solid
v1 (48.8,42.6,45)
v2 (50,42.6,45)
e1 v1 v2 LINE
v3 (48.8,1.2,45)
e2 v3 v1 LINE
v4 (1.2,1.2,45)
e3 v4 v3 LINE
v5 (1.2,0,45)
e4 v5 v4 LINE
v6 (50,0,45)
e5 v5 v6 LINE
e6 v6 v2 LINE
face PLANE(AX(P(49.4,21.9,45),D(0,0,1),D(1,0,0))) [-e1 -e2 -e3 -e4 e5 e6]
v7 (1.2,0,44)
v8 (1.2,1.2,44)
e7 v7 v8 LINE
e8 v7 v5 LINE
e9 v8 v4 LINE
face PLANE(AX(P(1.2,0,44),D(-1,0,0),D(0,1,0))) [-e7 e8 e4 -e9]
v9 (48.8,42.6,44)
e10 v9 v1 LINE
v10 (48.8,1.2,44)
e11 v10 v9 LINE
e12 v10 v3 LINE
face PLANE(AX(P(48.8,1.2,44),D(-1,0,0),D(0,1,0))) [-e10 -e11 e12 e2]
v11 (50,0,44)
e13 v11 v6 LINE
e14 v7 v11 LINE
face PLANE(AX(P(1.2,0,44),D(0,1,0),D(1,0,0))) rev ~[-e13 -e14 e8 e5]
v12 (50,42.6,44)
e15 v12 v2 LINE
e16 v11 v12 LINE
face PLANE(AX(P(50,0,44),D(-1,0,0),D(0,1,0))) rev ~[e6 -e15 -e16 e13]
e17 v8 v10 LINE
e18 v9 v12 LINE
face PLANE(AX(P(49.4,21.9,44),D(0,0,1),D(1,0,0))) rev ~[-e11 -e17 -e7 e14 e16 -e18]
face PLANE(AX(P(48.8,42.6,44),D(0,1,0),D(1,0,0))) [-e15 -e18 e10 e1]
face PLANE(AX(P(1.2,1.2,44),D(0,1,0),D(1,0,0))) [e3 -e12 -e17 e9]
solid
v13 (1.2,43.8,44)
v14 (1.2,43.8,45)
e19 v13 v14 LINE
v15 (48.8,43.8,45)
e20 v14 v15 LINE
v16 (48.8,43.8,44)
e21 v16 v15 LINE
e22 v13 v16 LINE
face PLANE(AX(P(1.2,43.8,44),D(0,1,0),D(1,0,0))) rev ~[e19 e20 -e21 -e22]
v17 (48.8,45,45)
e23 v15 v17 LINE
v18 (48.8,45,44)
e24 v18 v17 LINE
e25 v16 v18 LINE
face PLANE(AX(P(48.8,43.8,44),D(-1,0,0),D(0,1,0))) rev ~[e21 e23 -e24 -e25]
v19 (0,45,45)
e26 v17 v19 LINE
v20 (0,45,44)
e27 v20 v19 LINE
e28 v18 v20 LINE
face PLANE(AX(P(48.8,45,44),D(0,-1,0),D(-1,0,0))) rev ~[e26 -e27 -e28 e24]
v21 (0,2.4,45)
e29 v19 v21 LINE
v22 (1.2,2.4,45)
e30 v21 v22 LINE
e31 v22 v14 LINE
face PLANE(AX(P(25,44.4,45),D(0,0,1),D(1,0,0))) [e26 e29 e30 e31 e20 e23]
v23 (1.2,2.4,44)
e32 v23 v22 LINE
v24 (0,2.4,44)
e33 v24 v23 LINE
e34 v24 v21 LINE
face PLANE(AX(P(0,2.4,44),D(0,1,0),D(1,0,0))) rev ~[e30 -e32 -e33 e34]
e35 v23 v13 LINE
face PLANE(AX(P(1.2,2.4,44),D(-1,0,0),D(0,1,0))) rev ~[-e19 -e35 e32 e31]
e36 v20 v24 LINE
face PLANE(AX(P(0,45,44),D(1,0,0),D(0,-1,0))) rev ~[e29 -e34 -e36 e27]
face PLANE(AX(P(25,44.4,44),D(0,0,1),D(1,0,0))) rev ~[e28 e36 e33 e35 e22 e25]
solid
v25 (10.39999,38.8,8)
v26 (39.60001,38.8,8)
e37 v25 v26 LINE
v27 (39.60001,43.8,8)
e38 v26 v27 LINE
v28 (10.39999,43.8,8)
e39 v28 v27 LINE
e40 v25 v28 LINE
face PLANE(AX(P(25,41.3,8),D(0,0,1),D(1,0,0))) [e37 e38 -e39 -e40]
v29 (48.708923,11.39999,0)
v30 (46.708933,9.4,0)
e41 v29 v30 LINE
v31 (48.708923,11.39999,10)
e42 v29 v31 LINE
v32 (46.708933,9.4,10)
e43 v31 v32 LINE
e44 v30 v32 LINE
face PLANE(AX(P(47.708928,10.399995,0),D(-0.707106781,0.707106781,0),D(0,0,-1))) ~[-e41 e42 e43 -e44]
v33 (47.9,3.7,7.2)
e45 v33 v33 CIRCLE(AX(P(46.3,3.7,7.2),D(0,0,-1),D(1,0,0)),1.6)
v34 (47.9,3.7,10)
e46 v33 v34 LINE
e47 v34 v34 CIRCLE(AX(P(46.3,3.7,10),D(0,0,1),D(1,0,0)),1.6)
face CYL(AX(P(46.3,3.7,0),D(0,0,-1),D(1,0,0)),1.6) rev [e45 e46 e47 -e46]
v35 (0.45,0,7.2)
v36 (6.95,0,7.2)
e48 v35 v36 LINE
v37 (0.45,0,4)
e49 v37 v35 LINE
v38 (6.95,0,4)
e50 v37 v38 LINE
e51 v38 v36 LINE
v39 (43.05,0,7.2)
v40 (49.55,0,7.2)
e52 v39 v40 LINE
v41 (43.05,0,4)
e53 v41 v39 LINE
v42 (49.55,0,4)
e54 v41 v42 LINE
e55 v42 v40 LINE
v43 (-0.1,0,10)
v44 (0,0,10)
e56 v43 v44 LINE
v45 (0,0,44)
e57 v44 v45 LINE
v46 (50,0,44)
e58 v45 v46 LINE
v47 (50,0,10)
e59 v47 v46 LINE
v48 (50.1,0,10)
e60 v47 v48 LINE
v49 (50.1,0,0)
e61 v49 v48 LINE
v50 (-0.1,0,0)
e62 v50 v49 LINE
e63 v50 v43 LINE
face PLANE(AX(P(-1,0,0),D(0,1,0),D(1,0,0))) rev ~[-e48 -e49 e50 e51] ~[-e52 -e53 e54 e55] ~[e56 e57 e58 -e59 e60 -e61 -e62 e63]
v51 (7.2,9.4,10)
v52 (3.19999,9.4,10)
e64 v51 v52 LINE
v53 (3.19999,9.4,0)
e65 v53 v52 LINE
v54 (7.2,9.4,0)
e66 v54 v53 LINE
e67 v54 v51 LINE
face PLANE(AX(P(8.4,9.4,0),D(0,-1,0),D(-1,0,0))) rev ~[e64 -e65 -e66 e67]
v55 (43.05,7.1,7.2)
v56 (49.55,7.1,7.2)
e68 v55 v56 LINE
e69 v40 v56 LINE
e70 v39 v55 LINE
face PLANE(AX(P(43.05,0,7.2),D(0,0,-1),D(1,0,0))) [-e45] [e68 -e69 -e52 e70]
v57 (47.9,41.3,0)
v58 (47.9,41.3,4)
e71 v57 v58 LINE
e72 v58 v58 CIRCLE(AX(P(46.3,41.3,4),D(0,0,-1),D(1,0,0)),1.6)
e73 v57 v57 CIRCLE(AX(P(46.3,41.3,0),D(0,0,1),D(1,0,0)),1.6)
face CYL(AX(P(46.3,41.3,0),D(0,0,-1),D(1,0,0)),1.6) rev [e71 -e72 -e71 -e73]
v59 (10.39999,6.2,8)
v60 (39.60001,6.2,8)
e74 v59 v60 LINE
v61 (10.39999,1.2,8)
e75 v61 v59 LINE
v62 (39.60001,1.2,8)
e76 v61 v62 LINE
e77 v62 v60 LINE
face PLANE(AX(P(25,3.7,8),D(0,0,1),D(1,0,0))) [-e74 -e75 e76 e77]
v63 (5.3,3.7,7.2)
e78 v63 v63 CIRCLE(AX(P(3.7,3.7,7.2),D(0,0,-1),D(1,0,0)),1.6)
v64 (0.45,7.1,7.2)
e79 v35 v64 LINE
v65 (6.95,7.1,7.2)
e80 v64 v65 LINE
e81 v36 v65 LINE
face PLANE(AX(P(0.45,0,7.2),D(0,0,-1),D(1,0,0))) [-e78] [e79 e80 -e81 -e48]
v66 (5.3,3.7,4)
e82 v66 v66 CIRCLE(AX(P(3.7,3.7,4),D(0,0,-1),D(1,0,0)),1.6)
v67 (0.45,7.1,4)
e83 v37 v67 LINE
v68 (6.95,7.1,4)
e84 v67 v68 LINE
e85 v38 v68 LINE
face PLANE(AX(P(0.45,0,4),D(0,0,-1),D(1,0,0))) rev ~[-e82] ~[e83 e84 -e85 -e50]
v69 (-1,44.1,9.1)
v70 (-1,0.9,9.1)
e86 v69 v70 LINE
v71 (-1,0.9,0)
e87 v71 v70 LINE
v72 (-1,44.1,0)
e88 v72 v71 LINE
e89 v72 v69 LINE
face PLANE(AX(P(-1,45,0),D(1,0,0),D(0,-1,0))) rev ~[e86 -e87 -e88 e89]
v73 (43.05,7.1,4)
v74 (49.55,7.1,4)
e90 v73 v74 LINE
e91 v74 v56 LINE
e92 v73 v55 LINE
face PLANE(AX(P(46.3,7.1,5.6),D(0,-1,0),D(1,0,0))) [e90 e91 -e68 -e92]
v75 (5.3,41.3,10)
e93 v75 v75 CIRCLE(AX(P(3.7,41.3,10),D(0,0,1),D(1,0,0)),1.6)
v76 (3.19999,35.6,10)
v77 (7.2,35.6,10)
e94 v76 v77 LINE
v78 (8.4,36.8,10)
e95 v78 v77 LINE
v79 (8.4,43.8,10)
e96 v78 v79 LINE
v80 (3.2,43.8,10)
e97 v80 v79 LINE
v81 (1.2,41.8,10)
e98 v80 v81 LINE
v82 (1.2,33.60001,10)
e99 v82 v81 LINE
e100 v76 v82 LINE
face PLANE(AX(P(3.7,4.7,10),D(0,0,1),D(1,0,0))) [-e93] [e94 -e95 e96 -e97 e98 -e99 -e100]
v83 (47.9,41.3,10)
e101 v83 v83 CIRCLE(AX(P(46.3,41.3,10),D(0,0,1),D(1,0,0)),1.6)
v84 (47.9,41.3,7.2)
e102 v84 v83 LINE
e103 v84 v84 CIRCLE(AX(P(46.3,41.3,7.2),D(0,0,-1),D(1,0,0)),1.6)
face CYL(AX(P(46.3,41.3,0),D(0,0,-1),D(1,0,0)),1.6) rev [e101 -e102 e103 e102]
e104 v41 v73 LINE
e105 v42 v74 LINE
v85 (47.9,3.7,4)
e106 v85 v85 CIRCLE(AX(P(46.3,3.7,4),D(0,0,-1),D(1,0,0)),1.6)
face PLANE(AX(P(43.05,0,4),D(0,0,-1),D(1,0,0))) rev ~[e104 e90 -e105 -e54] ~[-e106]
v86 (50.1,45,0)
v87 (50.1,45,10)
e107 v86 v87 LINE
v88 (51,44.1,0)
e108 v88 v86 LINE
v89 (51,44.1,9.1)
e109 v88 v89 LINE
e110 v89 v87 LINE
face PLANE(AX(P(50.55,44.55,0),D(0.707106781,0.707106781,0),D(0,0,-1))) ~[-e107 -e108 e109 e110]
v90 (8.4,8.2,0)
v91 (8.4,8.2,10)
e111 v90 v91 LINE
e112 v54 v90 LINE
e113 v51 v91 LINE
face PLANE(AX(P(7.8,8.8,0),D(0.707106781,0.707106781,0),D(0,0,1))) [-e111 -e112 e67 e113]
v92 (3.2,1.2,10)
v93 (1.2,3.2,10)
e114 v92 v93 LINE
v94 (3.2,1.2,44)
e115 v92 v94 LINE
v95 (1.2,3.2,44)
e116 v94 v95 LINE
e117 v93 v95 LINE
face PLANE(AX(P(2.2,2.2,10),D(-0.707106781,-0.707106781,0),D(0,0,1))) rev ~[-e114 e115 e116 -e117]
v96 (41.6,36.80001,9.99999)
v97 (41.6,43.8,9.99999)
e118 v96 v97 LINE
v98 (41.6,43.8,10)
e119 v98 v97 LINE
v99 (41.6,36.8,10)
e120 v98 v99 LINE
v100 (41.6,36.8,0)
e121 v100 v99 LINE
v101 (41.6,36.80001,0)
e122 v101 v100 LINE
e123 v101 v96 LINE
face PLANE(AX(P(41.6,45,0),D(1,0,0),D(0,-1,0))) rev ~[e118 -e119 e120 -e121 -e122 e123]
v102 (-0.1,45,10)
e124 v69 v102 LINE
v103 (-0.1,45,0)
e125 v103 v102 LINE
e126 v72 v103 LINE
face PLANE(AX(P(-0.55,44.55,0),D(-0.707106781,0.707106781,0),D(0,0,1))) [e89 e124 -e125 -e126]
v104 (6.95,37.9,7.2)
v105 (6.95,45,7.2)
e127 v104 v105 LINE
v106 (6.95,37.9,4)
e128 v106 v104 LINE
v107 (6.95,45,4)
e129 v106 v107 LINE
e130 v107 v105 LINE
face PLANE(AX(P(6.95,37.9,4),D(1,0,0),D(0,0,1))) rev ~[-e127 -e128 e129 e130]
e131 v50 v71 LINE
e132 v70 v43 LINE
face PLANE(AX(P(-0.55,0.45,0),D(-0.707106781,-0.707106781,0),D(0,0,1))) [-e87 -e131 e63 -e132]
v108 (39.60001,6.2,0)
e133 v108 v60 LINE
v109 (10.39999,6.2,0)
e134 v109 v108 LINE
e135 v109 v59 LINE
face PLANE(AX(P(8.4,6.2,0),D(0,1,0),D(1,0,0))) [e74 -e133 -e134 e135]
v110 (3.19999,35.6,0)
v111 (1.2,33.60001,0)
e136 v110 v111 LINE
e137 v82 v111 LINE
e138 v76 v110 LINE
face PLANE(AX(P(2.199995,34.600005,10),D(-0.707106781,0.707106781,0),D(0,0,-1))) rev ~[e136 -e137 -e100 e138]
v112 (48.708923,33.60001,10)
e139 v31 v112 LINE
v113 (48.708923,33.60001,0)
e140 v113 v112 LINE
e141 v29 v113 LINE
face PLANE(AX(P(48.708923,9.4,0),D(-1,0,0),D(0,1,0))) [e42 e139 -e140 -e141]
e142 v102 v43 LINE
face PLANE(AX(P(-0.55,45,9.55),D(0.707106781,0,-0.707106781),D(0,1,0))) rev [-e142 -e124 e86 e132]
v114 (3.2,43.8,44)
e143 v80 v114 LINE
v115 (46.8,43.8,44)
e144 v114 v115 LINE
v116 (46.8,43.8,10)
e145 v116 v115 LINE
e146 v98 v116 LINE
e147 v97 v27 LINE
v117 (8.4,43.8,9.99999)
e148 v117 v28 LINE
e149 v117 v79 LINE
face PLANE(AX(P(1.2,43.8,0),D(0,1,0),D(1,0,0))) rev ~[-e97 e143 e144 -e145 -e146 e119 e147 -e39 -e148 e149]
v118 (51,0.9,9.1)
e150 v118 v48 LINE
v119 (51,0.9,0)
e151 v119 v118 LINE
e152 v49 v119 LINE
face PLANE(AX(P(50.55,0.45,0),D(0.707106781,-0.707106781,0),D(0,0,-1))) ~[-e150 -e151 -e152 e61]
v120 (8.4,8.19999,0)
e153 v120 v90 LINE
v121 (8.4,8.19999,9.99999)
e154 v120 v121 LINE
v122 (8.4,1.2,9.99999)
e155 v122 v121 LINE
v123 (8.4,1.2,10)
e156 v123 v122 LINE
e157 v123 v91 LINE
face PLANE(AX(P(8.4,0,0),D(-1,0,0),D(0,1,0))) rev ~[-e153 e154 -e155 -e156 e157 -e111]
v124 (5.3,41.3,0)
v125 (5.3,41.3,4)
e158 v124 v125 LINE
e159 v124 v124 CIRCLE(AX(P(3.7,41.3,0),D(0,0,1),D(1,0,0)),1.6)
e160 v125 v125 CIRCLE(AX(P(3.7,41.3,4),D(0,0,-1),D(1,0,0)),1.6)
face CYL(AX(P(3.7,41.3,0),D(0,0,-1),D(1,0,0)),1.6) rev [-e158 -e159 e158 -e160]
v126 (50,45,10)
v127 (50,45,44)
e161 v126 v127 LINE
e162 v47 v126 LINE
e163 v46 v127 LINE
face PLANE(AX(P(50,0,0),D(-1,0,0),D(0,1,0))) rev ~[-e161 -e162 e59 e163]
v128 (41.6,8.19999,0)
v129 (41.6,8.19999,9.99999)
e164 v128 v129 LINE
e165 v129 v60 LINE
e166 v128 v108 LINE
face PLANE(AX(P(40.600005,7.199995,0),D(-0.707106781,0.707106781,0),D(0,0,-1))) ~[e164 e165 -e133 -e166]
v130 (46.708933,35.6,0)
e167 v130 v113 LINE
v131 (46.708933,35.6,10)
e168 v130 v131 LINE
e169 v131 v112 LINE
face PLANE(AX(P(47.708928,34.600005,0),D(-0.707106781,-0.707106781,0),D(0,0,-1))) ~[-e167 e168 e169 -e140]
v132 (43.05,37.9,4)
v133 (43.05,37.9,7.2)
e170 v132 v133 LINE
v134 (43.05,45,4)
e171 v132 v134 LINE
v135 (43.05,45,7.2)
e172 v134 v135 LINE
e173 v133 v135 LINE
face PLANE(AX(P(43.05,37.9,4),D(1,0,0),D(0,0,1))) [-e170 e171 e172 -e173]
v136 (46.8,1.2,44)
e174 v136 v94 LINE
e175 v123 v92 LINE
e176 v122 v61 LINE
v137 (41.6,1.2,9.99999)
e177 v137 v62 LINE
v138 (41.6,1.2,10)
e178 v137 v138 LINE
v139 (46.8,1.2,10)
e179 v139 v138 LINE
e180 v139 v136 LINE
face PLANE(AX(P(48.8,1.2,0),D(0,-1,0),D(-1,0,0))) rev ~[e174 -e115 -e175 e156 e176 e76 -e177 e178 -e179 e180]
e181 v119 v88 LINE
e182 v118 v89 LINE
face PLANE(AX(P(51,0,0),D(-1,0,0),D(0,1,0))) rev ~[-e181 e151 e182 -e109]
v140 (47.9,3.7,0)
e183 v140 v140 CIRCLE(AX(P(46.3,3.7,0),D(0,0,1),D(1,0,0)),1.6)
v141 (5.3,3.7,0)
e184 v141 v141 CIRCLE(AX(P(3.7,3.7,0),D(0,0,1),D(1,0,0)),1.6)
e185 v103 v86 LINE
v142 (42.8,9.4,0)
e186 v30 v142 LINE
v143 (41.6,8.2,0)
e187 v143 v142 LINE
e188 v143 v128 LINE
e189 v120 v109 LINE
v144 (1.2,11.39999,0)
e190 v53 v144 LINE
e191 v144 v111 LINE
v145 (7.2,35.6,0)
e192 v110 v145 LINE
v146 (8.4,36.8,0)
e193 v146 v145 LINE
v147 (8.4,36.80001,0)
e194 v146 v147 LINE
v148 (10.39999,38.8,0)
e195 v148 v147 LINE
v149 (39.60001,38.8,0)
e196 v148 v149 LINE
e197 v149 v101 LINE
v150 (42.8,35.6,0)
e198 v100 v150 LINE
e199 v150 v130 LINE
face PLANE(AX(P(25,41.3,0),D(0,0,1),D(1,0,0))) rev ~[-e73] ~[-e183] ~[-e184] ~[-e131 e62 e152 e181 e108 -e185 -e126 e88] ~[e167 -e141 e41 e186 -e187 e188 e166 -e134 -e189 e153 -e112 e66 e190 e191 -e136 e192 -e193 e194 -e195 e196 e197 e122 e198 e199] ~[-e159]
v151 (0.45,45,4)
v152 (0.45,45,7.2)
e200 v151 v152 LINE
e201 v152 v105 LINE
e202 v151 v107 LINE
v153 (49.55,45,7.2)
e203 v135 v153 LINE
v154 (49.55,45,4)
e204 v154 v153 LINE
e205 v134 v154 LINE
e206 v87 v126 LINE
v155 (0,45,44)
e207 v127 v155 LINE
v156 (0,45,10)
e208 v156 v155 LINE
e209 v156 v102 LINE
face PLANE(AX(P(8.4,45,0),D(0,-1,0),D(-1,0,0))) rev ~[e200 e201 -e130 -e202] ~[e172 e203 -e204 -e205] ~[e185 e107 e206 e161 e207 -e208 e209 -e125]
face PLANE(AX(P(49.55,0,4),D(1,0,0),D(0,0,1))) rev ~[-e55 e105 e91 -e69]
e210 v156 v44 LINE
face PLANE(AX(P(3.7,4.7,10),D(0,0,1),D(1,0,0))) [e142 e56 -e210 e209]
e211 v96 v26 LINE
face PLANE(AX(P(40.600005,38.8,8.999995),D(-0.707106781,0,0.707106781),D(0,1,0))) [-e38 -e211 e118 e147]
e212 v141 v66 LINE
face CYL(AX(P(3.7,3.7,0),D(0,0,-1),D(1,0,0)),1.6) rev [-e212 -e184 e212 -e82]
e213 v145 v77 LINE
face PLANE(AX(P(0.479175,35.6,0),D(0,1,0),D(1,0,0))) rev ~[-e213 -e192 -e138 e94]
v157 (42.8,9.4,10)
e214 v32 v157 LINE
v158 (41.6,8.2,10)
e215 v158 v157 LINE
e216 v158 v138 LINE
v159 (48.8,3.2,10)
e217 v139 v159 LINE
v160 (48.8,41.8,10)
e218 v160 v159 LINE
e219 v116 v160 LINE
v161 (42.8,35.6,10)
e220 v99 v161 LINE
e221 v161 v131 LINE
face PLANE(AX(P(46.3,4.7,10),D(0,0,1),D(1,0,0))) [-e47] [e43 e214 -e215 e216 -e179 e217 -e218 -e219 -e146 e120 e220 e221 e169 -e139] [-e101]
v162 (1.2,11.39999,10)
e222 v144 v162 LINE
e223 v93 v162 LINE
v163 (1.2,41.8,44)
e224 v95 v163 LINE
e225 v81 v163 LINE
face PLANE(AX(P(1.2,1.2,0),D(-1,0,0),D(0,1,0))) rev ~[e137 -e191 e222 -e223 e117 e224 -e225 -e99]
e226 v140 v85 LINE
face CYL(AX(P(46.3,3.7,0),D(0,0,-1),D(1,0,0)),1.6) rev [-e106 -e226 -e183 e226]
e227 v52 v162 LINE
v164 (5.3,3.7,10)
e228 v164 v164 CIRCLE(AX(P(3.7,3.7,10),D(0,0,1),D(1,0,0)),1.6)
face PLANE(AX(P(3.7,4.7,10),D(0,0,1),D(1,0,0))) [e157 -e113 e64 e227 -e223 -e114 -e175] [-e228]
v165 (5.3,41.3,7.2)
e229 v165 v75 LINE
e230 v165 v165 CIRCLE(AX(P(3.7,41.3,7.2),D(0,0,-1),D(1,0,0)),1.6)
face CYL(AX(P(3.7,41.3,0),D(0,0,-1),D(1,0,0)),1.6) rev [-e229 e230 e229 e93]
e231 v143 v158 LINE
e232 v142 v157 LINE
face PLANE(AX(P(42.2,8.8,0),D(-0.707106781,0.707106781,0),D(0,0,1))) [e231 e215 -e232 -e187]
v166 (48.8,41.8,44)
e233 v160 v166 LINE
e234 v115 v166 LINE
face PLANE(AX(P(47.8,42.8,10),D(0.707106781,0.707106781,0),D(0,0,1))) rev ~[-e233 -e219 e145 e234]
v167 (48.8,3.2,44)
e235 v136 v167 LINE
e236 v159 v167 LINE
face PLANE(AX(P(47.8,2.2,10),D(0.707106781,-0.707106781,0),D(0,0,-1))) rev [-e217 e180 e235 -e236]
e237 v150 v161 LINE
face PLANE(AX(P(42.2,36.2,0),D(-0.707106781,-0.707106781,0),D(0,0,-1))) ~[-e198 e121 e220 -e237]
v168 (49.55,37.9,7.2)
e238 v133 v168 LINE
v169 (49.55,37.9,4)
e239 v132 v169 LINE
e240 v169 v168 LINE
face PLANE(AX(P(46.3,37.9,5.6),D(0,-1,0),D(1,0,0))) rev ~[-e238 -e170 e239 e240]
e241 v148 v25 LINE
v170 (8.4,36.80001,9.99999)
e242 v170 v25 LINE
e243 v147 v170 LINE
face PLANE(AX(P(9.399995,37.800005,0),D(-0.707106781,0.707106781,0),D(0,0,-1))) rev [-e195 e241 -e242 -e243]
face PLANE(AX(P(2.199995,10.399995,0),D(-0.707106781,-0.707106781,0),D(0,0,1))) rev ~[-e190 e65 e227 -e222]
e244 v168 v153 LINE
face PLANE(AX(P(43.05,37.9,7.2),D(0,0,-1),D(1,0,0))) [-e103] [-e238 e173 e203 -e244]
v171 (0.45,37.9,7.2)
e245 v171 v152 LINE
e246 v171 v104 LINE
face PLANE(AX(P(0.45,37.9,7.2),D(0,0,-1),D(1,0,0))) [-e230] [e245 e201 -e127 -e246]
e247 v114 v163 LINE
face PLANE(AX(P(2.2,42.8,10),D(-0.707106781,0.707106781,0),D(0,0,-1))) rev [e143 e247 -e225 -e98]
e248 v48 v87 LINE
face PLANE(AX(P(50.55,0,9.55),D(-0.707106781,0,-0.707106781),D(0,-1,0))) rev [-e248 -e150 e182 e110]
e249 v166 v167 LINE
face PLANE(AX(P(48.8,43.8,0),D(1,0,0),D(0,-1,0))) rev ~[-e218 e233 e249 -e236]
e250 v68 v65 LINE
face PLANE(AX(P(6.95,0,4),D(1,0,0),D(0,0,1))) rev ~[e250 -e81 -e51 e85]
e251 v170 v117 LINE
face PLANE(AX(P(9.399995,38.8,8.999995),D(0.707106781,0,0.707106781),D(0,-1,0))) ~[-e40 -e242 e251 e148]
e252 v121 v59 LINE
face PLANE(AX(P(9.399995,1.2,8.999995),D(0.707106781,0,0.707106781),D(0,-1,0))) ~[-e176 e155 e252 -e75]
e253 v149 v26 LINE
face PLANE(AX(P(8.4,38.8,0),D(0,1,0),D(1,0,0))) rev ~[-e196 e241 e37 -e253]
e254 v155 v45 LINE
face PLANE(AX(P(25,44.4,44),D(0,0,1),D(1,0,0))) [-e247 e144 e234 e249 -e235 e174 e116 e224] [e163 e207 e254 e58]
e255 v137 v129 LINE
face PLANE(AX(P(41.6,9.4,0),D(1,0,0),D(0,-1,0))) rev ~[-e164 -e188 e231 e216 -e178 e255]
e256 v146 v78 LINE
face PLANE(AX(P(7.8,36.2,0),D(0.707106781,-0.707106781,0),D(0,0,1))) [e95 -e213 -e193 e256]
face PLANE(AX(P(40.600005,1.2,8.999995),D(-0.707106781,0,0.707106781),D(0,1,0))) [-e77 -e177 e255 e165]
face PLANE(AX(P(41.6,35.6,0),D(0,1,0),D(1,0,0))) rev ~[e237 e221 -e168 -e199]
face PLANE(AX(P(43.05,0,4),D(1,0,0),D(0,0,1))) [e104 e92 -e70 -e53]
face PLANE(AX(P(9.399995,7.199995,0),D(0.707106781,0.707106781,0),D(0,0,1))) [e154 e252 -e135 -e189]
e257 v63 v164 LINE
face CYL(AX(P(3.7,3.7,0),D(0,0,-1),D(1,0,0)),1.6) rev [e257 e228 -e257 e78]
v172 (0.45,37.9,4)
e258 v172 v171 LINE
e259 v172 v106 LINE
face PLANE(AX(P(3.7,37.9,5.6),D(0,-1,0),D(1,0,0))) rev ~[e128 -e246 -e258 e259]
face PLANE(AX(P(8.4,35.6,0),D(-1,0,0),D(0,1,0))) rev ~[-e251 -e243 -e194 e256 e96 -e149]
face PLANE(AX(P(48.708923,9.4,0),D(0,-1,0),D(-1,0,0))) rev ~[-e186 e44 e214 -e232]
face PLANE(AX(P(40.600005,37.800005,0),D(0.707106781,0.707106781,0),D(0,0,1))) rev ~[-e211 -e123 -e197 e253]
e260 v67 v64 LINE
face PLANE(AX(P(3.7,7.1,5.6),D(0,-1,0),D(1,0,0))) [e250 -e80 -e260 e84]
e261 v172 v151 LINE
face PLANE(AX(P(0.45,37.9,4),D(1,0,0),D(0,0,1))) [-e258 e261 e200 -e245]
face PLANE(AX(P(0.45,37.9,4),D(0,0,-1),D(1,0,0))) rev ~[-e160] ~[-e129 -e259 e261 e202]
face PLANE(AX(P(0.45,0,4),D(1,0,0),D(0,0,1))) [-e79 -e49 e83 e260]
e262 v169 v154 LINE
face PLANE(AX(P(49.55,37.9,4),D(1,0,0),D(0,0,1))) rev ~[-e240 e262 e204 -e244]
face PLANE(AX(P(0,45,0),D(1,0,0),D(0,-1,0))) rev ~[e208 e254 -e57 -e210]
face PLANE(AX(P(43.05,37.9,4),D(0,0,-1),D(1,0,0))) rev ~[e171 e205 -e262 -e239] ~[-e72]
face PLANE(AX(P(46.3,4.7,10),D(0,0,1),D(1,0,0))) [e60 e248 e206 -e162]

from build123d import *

# Parameters (mm, degrees)
F0_W      = 47.6
F0_H      = 1.2
F0_W_2    = 1.2
F0_H_2    = 42.6
F1_DEPTH  = 44
F2_R      = 1.6
F2_W      = 1.4791749234
F2_H      = 26.2
F2_W_2    = 2.291076839
F3_DEPTH  = 10
F4_W      = 6.5
F4_H      = 3.2
F5_DEPTH  = 7.1
F6_START  = -37.9
F6_DEPTH  = 7.1
F7_SIZE   = 0.9
F8_W      = 47.6
F8_H      = 1.2
F8_W_2    = 1.2
F8_H_2    = 41.4
F9_DEPTH  = 1
F10_W     = 33.2
F10_H     = 5
F11_DEPTH = 8
F12_SIZE  = 1.99999
F13_SIZE  = 2
F14_SIZE  = 1.2


# Not quite as in the source:
# - a fillet or chamfer is up to 0.001 mm smaller than in the source, because OpenCascade refuses the exact size


with BuildPart() as f1:
    # F0 (on Top) → F1 (new body)
    with BuildSketch(Plane.XY):
        with Locations((25, 44.4)):
            Rectangle(F0_W, F0_H)
        with Locations((49.4, 44.4)):
            Rectangle(F0_W_2, F0_H)
        with Locations((49.4, 22.5)):
            Rectangle(F0_W_2, F0_H_2)
        with Locations((49.4, 0.6)):
            Rectangle(F0_W_2, F0_H)
        with Locations((25, 0.6)):
            Rectangle(F0_W, F0_H)
        with Locations((0.6, 0.6)):
            Rectangle(F0_W_2, F0_H)
        with Locations((0.6, 22.5)):
            Rectangle(F0_W_2, F0_H_2)
        with Locations((0.6, 44.4)):
            Rectangle(F0_W_2, F0_H)
    extrude(amount=F1_DEPTH)

    # F2 (on face) → F3 (join)
    with BuildSketch(Plane.XY):
        Polygon((-1, 9.4), (-1, 0), (8.4, 0), (8.4, 9.4), (0.4791749234, 9.4), align=None)
        with Locations((3.7, 3.7)):
            Circle(F2_R, mode=Mode.SUBTRACT)
        with Locations((-0.2604125383, 22.5)):
            Rectangle(F2_W, F2_H)
        Polygon((-1, 45), (-1, 35.6), (0.4791749234, 35.6), (8.4, 35.6), (8.4, 45), align=None)
        with Locations((3.7, 41.3)):
            Circle(F2_R, mode=Mode.SUBTRACT)
        Polygon((41.6, 9.4), (41.6, 0), (51, 0), (51, 9.4), (48.708923161, 9.4), align=None)
        with Locations((46.3, 3.7)):
            Circle(F2_R, mode=Mode.SUBTRACT)
        with Locations((49.8544615805, 22.5)):
            Rectangle(F2_W_2, F2_H)
        Polygon((41.6, 35.6), (48.708923161, 35.6), (51, 35.6), (51, 45), (41.6, 45), align=None)
        with Locations((46.3, 41.3)):
            Circle(F2_R, mode=Mode.SUBTRACT)
    extrude(amount=F3_DEPTH)

    # F4 (on face) → F5 (cut)
    with BuildSketch(Plane.XZ):
        with Locations((3.7, 5.6)):
            Rectangle(F4_W, F4_H)
        with Locations((46.3, 5.6)):
            Rectangle(F4_W, F4_H)
    extrude(amount=-F5_DEPTH, mode=Mode.SUBTRACT)

    # F4 (on face) → F6 (cut)
    with BuildSketch(Plane.XZ.offset(F6_START)):
        with Locations((3.7, 5.6)):
            Rectangle(F4_W, F4_H)
        with Locations((46.3, 5.6)):
            Rectangle(F4_W, F4_H)
    extrude(amount=-F6_DEPTH, mode=Mode.SUBTRACT)

    # F7
    f7_edges = [f1.edges().sort_by_distance(p)[0] for p in [
        (-1, 45, 5),
        (-1, 22.5, 10),
        (51, 22.5, 10),
        (-1, 0, 5),
        (51, 0, 5),
        (51, 45, 5),
    ]]
    chamfer(f7_edges, length=F7_SIZE)

    # F10 (on face) → F11 (join)
    with BuildSketch(Plane.XY):
        with Locations((25, 41.3)):
            Rectangle(F10_W, F10_H)
        with Locations((25, 3.7)):
            Rectangle(F10_W, F10_H)
    extrude(amount=F11_DEPTH)

    # F12 (size 2 in the source; OpenCascade refuses exactly that, so slightly less here)
    f12_edges = [f1.edges().sort_by_distance(p)[0] for p in [
        (8.4, 41.3, 8),
        (41.6, 41.3, 8),
        (41.6, 38.8, 4),
        (8.4, 38.8, 4),
        (41.6, 6.2, 4),
        (41.6, 3.7, 8),
        (8.4, 3.7, 8),
        (8.4, 6.2, 4),
        (1.2, 35.6, 5),
        (48.708923, 35.6, 5),
        (48.708923, 9.4, 5),
        (1.2, 9.4, 5),
    ]]
    chamfer(f12_edges, length=F12_SIZE)

    # F13
    f13_edges = [f1.edges().sort_by_distance(p)[0] for p in [
        (48.8, 43.8, 27),
        (1.2, 43.8, 27),
        (1.2, 1.2, 27),
        (48.8, 1.2, 27),
    ]]
    chamfer(f13_edges, length=F13_SIZE)

    # F14
    f14_edges = [f1.edges().sort_by_distance(p)[0] for p in [
        (8.4, 35.6, 5),
        (41.6, 35.6, 5),
        (41.6, 9.4, 5),
        (8.4, 9.4, 5),
    ]]
    chamfer(f14_edges, length=F14_SIZE)


with BuildPart() as f9:
    # F8 (on face) → F9 (new body)
    with BuildSketch(Plane.XY.offset(44)):
        with Locations((25, 44.4)):
            Rectangle(F8_W, F8_H)
        with Locations((0.6, 23.1)):
            Rectangle(F8_W_2, F8_H_2)
        with Locations((0.6, 44.4)):
            Rectangle(F8_W_2, F8_H)
    extrude(amount=F9_DEPTH)


with BuildPart() as f9b:
    # F8 (on face) → F9, piece 2 (new body)
    with BuildSketch(Plane.XY.offset(44)):
        with Locations((49.4, 21.9)):
            Rectangle(F8_W_2, F8_H_2)
        with Locations((25, 0.6)):
            Rectangle(F8_W, F8_H)
        with Locations((49.4, 0.6)):
            Rectangle(F8_W_2, F8_H)
    extrude(amount=F9_DEPTH)


solid = Compound([f1.part, f9.part, f9b.part])
